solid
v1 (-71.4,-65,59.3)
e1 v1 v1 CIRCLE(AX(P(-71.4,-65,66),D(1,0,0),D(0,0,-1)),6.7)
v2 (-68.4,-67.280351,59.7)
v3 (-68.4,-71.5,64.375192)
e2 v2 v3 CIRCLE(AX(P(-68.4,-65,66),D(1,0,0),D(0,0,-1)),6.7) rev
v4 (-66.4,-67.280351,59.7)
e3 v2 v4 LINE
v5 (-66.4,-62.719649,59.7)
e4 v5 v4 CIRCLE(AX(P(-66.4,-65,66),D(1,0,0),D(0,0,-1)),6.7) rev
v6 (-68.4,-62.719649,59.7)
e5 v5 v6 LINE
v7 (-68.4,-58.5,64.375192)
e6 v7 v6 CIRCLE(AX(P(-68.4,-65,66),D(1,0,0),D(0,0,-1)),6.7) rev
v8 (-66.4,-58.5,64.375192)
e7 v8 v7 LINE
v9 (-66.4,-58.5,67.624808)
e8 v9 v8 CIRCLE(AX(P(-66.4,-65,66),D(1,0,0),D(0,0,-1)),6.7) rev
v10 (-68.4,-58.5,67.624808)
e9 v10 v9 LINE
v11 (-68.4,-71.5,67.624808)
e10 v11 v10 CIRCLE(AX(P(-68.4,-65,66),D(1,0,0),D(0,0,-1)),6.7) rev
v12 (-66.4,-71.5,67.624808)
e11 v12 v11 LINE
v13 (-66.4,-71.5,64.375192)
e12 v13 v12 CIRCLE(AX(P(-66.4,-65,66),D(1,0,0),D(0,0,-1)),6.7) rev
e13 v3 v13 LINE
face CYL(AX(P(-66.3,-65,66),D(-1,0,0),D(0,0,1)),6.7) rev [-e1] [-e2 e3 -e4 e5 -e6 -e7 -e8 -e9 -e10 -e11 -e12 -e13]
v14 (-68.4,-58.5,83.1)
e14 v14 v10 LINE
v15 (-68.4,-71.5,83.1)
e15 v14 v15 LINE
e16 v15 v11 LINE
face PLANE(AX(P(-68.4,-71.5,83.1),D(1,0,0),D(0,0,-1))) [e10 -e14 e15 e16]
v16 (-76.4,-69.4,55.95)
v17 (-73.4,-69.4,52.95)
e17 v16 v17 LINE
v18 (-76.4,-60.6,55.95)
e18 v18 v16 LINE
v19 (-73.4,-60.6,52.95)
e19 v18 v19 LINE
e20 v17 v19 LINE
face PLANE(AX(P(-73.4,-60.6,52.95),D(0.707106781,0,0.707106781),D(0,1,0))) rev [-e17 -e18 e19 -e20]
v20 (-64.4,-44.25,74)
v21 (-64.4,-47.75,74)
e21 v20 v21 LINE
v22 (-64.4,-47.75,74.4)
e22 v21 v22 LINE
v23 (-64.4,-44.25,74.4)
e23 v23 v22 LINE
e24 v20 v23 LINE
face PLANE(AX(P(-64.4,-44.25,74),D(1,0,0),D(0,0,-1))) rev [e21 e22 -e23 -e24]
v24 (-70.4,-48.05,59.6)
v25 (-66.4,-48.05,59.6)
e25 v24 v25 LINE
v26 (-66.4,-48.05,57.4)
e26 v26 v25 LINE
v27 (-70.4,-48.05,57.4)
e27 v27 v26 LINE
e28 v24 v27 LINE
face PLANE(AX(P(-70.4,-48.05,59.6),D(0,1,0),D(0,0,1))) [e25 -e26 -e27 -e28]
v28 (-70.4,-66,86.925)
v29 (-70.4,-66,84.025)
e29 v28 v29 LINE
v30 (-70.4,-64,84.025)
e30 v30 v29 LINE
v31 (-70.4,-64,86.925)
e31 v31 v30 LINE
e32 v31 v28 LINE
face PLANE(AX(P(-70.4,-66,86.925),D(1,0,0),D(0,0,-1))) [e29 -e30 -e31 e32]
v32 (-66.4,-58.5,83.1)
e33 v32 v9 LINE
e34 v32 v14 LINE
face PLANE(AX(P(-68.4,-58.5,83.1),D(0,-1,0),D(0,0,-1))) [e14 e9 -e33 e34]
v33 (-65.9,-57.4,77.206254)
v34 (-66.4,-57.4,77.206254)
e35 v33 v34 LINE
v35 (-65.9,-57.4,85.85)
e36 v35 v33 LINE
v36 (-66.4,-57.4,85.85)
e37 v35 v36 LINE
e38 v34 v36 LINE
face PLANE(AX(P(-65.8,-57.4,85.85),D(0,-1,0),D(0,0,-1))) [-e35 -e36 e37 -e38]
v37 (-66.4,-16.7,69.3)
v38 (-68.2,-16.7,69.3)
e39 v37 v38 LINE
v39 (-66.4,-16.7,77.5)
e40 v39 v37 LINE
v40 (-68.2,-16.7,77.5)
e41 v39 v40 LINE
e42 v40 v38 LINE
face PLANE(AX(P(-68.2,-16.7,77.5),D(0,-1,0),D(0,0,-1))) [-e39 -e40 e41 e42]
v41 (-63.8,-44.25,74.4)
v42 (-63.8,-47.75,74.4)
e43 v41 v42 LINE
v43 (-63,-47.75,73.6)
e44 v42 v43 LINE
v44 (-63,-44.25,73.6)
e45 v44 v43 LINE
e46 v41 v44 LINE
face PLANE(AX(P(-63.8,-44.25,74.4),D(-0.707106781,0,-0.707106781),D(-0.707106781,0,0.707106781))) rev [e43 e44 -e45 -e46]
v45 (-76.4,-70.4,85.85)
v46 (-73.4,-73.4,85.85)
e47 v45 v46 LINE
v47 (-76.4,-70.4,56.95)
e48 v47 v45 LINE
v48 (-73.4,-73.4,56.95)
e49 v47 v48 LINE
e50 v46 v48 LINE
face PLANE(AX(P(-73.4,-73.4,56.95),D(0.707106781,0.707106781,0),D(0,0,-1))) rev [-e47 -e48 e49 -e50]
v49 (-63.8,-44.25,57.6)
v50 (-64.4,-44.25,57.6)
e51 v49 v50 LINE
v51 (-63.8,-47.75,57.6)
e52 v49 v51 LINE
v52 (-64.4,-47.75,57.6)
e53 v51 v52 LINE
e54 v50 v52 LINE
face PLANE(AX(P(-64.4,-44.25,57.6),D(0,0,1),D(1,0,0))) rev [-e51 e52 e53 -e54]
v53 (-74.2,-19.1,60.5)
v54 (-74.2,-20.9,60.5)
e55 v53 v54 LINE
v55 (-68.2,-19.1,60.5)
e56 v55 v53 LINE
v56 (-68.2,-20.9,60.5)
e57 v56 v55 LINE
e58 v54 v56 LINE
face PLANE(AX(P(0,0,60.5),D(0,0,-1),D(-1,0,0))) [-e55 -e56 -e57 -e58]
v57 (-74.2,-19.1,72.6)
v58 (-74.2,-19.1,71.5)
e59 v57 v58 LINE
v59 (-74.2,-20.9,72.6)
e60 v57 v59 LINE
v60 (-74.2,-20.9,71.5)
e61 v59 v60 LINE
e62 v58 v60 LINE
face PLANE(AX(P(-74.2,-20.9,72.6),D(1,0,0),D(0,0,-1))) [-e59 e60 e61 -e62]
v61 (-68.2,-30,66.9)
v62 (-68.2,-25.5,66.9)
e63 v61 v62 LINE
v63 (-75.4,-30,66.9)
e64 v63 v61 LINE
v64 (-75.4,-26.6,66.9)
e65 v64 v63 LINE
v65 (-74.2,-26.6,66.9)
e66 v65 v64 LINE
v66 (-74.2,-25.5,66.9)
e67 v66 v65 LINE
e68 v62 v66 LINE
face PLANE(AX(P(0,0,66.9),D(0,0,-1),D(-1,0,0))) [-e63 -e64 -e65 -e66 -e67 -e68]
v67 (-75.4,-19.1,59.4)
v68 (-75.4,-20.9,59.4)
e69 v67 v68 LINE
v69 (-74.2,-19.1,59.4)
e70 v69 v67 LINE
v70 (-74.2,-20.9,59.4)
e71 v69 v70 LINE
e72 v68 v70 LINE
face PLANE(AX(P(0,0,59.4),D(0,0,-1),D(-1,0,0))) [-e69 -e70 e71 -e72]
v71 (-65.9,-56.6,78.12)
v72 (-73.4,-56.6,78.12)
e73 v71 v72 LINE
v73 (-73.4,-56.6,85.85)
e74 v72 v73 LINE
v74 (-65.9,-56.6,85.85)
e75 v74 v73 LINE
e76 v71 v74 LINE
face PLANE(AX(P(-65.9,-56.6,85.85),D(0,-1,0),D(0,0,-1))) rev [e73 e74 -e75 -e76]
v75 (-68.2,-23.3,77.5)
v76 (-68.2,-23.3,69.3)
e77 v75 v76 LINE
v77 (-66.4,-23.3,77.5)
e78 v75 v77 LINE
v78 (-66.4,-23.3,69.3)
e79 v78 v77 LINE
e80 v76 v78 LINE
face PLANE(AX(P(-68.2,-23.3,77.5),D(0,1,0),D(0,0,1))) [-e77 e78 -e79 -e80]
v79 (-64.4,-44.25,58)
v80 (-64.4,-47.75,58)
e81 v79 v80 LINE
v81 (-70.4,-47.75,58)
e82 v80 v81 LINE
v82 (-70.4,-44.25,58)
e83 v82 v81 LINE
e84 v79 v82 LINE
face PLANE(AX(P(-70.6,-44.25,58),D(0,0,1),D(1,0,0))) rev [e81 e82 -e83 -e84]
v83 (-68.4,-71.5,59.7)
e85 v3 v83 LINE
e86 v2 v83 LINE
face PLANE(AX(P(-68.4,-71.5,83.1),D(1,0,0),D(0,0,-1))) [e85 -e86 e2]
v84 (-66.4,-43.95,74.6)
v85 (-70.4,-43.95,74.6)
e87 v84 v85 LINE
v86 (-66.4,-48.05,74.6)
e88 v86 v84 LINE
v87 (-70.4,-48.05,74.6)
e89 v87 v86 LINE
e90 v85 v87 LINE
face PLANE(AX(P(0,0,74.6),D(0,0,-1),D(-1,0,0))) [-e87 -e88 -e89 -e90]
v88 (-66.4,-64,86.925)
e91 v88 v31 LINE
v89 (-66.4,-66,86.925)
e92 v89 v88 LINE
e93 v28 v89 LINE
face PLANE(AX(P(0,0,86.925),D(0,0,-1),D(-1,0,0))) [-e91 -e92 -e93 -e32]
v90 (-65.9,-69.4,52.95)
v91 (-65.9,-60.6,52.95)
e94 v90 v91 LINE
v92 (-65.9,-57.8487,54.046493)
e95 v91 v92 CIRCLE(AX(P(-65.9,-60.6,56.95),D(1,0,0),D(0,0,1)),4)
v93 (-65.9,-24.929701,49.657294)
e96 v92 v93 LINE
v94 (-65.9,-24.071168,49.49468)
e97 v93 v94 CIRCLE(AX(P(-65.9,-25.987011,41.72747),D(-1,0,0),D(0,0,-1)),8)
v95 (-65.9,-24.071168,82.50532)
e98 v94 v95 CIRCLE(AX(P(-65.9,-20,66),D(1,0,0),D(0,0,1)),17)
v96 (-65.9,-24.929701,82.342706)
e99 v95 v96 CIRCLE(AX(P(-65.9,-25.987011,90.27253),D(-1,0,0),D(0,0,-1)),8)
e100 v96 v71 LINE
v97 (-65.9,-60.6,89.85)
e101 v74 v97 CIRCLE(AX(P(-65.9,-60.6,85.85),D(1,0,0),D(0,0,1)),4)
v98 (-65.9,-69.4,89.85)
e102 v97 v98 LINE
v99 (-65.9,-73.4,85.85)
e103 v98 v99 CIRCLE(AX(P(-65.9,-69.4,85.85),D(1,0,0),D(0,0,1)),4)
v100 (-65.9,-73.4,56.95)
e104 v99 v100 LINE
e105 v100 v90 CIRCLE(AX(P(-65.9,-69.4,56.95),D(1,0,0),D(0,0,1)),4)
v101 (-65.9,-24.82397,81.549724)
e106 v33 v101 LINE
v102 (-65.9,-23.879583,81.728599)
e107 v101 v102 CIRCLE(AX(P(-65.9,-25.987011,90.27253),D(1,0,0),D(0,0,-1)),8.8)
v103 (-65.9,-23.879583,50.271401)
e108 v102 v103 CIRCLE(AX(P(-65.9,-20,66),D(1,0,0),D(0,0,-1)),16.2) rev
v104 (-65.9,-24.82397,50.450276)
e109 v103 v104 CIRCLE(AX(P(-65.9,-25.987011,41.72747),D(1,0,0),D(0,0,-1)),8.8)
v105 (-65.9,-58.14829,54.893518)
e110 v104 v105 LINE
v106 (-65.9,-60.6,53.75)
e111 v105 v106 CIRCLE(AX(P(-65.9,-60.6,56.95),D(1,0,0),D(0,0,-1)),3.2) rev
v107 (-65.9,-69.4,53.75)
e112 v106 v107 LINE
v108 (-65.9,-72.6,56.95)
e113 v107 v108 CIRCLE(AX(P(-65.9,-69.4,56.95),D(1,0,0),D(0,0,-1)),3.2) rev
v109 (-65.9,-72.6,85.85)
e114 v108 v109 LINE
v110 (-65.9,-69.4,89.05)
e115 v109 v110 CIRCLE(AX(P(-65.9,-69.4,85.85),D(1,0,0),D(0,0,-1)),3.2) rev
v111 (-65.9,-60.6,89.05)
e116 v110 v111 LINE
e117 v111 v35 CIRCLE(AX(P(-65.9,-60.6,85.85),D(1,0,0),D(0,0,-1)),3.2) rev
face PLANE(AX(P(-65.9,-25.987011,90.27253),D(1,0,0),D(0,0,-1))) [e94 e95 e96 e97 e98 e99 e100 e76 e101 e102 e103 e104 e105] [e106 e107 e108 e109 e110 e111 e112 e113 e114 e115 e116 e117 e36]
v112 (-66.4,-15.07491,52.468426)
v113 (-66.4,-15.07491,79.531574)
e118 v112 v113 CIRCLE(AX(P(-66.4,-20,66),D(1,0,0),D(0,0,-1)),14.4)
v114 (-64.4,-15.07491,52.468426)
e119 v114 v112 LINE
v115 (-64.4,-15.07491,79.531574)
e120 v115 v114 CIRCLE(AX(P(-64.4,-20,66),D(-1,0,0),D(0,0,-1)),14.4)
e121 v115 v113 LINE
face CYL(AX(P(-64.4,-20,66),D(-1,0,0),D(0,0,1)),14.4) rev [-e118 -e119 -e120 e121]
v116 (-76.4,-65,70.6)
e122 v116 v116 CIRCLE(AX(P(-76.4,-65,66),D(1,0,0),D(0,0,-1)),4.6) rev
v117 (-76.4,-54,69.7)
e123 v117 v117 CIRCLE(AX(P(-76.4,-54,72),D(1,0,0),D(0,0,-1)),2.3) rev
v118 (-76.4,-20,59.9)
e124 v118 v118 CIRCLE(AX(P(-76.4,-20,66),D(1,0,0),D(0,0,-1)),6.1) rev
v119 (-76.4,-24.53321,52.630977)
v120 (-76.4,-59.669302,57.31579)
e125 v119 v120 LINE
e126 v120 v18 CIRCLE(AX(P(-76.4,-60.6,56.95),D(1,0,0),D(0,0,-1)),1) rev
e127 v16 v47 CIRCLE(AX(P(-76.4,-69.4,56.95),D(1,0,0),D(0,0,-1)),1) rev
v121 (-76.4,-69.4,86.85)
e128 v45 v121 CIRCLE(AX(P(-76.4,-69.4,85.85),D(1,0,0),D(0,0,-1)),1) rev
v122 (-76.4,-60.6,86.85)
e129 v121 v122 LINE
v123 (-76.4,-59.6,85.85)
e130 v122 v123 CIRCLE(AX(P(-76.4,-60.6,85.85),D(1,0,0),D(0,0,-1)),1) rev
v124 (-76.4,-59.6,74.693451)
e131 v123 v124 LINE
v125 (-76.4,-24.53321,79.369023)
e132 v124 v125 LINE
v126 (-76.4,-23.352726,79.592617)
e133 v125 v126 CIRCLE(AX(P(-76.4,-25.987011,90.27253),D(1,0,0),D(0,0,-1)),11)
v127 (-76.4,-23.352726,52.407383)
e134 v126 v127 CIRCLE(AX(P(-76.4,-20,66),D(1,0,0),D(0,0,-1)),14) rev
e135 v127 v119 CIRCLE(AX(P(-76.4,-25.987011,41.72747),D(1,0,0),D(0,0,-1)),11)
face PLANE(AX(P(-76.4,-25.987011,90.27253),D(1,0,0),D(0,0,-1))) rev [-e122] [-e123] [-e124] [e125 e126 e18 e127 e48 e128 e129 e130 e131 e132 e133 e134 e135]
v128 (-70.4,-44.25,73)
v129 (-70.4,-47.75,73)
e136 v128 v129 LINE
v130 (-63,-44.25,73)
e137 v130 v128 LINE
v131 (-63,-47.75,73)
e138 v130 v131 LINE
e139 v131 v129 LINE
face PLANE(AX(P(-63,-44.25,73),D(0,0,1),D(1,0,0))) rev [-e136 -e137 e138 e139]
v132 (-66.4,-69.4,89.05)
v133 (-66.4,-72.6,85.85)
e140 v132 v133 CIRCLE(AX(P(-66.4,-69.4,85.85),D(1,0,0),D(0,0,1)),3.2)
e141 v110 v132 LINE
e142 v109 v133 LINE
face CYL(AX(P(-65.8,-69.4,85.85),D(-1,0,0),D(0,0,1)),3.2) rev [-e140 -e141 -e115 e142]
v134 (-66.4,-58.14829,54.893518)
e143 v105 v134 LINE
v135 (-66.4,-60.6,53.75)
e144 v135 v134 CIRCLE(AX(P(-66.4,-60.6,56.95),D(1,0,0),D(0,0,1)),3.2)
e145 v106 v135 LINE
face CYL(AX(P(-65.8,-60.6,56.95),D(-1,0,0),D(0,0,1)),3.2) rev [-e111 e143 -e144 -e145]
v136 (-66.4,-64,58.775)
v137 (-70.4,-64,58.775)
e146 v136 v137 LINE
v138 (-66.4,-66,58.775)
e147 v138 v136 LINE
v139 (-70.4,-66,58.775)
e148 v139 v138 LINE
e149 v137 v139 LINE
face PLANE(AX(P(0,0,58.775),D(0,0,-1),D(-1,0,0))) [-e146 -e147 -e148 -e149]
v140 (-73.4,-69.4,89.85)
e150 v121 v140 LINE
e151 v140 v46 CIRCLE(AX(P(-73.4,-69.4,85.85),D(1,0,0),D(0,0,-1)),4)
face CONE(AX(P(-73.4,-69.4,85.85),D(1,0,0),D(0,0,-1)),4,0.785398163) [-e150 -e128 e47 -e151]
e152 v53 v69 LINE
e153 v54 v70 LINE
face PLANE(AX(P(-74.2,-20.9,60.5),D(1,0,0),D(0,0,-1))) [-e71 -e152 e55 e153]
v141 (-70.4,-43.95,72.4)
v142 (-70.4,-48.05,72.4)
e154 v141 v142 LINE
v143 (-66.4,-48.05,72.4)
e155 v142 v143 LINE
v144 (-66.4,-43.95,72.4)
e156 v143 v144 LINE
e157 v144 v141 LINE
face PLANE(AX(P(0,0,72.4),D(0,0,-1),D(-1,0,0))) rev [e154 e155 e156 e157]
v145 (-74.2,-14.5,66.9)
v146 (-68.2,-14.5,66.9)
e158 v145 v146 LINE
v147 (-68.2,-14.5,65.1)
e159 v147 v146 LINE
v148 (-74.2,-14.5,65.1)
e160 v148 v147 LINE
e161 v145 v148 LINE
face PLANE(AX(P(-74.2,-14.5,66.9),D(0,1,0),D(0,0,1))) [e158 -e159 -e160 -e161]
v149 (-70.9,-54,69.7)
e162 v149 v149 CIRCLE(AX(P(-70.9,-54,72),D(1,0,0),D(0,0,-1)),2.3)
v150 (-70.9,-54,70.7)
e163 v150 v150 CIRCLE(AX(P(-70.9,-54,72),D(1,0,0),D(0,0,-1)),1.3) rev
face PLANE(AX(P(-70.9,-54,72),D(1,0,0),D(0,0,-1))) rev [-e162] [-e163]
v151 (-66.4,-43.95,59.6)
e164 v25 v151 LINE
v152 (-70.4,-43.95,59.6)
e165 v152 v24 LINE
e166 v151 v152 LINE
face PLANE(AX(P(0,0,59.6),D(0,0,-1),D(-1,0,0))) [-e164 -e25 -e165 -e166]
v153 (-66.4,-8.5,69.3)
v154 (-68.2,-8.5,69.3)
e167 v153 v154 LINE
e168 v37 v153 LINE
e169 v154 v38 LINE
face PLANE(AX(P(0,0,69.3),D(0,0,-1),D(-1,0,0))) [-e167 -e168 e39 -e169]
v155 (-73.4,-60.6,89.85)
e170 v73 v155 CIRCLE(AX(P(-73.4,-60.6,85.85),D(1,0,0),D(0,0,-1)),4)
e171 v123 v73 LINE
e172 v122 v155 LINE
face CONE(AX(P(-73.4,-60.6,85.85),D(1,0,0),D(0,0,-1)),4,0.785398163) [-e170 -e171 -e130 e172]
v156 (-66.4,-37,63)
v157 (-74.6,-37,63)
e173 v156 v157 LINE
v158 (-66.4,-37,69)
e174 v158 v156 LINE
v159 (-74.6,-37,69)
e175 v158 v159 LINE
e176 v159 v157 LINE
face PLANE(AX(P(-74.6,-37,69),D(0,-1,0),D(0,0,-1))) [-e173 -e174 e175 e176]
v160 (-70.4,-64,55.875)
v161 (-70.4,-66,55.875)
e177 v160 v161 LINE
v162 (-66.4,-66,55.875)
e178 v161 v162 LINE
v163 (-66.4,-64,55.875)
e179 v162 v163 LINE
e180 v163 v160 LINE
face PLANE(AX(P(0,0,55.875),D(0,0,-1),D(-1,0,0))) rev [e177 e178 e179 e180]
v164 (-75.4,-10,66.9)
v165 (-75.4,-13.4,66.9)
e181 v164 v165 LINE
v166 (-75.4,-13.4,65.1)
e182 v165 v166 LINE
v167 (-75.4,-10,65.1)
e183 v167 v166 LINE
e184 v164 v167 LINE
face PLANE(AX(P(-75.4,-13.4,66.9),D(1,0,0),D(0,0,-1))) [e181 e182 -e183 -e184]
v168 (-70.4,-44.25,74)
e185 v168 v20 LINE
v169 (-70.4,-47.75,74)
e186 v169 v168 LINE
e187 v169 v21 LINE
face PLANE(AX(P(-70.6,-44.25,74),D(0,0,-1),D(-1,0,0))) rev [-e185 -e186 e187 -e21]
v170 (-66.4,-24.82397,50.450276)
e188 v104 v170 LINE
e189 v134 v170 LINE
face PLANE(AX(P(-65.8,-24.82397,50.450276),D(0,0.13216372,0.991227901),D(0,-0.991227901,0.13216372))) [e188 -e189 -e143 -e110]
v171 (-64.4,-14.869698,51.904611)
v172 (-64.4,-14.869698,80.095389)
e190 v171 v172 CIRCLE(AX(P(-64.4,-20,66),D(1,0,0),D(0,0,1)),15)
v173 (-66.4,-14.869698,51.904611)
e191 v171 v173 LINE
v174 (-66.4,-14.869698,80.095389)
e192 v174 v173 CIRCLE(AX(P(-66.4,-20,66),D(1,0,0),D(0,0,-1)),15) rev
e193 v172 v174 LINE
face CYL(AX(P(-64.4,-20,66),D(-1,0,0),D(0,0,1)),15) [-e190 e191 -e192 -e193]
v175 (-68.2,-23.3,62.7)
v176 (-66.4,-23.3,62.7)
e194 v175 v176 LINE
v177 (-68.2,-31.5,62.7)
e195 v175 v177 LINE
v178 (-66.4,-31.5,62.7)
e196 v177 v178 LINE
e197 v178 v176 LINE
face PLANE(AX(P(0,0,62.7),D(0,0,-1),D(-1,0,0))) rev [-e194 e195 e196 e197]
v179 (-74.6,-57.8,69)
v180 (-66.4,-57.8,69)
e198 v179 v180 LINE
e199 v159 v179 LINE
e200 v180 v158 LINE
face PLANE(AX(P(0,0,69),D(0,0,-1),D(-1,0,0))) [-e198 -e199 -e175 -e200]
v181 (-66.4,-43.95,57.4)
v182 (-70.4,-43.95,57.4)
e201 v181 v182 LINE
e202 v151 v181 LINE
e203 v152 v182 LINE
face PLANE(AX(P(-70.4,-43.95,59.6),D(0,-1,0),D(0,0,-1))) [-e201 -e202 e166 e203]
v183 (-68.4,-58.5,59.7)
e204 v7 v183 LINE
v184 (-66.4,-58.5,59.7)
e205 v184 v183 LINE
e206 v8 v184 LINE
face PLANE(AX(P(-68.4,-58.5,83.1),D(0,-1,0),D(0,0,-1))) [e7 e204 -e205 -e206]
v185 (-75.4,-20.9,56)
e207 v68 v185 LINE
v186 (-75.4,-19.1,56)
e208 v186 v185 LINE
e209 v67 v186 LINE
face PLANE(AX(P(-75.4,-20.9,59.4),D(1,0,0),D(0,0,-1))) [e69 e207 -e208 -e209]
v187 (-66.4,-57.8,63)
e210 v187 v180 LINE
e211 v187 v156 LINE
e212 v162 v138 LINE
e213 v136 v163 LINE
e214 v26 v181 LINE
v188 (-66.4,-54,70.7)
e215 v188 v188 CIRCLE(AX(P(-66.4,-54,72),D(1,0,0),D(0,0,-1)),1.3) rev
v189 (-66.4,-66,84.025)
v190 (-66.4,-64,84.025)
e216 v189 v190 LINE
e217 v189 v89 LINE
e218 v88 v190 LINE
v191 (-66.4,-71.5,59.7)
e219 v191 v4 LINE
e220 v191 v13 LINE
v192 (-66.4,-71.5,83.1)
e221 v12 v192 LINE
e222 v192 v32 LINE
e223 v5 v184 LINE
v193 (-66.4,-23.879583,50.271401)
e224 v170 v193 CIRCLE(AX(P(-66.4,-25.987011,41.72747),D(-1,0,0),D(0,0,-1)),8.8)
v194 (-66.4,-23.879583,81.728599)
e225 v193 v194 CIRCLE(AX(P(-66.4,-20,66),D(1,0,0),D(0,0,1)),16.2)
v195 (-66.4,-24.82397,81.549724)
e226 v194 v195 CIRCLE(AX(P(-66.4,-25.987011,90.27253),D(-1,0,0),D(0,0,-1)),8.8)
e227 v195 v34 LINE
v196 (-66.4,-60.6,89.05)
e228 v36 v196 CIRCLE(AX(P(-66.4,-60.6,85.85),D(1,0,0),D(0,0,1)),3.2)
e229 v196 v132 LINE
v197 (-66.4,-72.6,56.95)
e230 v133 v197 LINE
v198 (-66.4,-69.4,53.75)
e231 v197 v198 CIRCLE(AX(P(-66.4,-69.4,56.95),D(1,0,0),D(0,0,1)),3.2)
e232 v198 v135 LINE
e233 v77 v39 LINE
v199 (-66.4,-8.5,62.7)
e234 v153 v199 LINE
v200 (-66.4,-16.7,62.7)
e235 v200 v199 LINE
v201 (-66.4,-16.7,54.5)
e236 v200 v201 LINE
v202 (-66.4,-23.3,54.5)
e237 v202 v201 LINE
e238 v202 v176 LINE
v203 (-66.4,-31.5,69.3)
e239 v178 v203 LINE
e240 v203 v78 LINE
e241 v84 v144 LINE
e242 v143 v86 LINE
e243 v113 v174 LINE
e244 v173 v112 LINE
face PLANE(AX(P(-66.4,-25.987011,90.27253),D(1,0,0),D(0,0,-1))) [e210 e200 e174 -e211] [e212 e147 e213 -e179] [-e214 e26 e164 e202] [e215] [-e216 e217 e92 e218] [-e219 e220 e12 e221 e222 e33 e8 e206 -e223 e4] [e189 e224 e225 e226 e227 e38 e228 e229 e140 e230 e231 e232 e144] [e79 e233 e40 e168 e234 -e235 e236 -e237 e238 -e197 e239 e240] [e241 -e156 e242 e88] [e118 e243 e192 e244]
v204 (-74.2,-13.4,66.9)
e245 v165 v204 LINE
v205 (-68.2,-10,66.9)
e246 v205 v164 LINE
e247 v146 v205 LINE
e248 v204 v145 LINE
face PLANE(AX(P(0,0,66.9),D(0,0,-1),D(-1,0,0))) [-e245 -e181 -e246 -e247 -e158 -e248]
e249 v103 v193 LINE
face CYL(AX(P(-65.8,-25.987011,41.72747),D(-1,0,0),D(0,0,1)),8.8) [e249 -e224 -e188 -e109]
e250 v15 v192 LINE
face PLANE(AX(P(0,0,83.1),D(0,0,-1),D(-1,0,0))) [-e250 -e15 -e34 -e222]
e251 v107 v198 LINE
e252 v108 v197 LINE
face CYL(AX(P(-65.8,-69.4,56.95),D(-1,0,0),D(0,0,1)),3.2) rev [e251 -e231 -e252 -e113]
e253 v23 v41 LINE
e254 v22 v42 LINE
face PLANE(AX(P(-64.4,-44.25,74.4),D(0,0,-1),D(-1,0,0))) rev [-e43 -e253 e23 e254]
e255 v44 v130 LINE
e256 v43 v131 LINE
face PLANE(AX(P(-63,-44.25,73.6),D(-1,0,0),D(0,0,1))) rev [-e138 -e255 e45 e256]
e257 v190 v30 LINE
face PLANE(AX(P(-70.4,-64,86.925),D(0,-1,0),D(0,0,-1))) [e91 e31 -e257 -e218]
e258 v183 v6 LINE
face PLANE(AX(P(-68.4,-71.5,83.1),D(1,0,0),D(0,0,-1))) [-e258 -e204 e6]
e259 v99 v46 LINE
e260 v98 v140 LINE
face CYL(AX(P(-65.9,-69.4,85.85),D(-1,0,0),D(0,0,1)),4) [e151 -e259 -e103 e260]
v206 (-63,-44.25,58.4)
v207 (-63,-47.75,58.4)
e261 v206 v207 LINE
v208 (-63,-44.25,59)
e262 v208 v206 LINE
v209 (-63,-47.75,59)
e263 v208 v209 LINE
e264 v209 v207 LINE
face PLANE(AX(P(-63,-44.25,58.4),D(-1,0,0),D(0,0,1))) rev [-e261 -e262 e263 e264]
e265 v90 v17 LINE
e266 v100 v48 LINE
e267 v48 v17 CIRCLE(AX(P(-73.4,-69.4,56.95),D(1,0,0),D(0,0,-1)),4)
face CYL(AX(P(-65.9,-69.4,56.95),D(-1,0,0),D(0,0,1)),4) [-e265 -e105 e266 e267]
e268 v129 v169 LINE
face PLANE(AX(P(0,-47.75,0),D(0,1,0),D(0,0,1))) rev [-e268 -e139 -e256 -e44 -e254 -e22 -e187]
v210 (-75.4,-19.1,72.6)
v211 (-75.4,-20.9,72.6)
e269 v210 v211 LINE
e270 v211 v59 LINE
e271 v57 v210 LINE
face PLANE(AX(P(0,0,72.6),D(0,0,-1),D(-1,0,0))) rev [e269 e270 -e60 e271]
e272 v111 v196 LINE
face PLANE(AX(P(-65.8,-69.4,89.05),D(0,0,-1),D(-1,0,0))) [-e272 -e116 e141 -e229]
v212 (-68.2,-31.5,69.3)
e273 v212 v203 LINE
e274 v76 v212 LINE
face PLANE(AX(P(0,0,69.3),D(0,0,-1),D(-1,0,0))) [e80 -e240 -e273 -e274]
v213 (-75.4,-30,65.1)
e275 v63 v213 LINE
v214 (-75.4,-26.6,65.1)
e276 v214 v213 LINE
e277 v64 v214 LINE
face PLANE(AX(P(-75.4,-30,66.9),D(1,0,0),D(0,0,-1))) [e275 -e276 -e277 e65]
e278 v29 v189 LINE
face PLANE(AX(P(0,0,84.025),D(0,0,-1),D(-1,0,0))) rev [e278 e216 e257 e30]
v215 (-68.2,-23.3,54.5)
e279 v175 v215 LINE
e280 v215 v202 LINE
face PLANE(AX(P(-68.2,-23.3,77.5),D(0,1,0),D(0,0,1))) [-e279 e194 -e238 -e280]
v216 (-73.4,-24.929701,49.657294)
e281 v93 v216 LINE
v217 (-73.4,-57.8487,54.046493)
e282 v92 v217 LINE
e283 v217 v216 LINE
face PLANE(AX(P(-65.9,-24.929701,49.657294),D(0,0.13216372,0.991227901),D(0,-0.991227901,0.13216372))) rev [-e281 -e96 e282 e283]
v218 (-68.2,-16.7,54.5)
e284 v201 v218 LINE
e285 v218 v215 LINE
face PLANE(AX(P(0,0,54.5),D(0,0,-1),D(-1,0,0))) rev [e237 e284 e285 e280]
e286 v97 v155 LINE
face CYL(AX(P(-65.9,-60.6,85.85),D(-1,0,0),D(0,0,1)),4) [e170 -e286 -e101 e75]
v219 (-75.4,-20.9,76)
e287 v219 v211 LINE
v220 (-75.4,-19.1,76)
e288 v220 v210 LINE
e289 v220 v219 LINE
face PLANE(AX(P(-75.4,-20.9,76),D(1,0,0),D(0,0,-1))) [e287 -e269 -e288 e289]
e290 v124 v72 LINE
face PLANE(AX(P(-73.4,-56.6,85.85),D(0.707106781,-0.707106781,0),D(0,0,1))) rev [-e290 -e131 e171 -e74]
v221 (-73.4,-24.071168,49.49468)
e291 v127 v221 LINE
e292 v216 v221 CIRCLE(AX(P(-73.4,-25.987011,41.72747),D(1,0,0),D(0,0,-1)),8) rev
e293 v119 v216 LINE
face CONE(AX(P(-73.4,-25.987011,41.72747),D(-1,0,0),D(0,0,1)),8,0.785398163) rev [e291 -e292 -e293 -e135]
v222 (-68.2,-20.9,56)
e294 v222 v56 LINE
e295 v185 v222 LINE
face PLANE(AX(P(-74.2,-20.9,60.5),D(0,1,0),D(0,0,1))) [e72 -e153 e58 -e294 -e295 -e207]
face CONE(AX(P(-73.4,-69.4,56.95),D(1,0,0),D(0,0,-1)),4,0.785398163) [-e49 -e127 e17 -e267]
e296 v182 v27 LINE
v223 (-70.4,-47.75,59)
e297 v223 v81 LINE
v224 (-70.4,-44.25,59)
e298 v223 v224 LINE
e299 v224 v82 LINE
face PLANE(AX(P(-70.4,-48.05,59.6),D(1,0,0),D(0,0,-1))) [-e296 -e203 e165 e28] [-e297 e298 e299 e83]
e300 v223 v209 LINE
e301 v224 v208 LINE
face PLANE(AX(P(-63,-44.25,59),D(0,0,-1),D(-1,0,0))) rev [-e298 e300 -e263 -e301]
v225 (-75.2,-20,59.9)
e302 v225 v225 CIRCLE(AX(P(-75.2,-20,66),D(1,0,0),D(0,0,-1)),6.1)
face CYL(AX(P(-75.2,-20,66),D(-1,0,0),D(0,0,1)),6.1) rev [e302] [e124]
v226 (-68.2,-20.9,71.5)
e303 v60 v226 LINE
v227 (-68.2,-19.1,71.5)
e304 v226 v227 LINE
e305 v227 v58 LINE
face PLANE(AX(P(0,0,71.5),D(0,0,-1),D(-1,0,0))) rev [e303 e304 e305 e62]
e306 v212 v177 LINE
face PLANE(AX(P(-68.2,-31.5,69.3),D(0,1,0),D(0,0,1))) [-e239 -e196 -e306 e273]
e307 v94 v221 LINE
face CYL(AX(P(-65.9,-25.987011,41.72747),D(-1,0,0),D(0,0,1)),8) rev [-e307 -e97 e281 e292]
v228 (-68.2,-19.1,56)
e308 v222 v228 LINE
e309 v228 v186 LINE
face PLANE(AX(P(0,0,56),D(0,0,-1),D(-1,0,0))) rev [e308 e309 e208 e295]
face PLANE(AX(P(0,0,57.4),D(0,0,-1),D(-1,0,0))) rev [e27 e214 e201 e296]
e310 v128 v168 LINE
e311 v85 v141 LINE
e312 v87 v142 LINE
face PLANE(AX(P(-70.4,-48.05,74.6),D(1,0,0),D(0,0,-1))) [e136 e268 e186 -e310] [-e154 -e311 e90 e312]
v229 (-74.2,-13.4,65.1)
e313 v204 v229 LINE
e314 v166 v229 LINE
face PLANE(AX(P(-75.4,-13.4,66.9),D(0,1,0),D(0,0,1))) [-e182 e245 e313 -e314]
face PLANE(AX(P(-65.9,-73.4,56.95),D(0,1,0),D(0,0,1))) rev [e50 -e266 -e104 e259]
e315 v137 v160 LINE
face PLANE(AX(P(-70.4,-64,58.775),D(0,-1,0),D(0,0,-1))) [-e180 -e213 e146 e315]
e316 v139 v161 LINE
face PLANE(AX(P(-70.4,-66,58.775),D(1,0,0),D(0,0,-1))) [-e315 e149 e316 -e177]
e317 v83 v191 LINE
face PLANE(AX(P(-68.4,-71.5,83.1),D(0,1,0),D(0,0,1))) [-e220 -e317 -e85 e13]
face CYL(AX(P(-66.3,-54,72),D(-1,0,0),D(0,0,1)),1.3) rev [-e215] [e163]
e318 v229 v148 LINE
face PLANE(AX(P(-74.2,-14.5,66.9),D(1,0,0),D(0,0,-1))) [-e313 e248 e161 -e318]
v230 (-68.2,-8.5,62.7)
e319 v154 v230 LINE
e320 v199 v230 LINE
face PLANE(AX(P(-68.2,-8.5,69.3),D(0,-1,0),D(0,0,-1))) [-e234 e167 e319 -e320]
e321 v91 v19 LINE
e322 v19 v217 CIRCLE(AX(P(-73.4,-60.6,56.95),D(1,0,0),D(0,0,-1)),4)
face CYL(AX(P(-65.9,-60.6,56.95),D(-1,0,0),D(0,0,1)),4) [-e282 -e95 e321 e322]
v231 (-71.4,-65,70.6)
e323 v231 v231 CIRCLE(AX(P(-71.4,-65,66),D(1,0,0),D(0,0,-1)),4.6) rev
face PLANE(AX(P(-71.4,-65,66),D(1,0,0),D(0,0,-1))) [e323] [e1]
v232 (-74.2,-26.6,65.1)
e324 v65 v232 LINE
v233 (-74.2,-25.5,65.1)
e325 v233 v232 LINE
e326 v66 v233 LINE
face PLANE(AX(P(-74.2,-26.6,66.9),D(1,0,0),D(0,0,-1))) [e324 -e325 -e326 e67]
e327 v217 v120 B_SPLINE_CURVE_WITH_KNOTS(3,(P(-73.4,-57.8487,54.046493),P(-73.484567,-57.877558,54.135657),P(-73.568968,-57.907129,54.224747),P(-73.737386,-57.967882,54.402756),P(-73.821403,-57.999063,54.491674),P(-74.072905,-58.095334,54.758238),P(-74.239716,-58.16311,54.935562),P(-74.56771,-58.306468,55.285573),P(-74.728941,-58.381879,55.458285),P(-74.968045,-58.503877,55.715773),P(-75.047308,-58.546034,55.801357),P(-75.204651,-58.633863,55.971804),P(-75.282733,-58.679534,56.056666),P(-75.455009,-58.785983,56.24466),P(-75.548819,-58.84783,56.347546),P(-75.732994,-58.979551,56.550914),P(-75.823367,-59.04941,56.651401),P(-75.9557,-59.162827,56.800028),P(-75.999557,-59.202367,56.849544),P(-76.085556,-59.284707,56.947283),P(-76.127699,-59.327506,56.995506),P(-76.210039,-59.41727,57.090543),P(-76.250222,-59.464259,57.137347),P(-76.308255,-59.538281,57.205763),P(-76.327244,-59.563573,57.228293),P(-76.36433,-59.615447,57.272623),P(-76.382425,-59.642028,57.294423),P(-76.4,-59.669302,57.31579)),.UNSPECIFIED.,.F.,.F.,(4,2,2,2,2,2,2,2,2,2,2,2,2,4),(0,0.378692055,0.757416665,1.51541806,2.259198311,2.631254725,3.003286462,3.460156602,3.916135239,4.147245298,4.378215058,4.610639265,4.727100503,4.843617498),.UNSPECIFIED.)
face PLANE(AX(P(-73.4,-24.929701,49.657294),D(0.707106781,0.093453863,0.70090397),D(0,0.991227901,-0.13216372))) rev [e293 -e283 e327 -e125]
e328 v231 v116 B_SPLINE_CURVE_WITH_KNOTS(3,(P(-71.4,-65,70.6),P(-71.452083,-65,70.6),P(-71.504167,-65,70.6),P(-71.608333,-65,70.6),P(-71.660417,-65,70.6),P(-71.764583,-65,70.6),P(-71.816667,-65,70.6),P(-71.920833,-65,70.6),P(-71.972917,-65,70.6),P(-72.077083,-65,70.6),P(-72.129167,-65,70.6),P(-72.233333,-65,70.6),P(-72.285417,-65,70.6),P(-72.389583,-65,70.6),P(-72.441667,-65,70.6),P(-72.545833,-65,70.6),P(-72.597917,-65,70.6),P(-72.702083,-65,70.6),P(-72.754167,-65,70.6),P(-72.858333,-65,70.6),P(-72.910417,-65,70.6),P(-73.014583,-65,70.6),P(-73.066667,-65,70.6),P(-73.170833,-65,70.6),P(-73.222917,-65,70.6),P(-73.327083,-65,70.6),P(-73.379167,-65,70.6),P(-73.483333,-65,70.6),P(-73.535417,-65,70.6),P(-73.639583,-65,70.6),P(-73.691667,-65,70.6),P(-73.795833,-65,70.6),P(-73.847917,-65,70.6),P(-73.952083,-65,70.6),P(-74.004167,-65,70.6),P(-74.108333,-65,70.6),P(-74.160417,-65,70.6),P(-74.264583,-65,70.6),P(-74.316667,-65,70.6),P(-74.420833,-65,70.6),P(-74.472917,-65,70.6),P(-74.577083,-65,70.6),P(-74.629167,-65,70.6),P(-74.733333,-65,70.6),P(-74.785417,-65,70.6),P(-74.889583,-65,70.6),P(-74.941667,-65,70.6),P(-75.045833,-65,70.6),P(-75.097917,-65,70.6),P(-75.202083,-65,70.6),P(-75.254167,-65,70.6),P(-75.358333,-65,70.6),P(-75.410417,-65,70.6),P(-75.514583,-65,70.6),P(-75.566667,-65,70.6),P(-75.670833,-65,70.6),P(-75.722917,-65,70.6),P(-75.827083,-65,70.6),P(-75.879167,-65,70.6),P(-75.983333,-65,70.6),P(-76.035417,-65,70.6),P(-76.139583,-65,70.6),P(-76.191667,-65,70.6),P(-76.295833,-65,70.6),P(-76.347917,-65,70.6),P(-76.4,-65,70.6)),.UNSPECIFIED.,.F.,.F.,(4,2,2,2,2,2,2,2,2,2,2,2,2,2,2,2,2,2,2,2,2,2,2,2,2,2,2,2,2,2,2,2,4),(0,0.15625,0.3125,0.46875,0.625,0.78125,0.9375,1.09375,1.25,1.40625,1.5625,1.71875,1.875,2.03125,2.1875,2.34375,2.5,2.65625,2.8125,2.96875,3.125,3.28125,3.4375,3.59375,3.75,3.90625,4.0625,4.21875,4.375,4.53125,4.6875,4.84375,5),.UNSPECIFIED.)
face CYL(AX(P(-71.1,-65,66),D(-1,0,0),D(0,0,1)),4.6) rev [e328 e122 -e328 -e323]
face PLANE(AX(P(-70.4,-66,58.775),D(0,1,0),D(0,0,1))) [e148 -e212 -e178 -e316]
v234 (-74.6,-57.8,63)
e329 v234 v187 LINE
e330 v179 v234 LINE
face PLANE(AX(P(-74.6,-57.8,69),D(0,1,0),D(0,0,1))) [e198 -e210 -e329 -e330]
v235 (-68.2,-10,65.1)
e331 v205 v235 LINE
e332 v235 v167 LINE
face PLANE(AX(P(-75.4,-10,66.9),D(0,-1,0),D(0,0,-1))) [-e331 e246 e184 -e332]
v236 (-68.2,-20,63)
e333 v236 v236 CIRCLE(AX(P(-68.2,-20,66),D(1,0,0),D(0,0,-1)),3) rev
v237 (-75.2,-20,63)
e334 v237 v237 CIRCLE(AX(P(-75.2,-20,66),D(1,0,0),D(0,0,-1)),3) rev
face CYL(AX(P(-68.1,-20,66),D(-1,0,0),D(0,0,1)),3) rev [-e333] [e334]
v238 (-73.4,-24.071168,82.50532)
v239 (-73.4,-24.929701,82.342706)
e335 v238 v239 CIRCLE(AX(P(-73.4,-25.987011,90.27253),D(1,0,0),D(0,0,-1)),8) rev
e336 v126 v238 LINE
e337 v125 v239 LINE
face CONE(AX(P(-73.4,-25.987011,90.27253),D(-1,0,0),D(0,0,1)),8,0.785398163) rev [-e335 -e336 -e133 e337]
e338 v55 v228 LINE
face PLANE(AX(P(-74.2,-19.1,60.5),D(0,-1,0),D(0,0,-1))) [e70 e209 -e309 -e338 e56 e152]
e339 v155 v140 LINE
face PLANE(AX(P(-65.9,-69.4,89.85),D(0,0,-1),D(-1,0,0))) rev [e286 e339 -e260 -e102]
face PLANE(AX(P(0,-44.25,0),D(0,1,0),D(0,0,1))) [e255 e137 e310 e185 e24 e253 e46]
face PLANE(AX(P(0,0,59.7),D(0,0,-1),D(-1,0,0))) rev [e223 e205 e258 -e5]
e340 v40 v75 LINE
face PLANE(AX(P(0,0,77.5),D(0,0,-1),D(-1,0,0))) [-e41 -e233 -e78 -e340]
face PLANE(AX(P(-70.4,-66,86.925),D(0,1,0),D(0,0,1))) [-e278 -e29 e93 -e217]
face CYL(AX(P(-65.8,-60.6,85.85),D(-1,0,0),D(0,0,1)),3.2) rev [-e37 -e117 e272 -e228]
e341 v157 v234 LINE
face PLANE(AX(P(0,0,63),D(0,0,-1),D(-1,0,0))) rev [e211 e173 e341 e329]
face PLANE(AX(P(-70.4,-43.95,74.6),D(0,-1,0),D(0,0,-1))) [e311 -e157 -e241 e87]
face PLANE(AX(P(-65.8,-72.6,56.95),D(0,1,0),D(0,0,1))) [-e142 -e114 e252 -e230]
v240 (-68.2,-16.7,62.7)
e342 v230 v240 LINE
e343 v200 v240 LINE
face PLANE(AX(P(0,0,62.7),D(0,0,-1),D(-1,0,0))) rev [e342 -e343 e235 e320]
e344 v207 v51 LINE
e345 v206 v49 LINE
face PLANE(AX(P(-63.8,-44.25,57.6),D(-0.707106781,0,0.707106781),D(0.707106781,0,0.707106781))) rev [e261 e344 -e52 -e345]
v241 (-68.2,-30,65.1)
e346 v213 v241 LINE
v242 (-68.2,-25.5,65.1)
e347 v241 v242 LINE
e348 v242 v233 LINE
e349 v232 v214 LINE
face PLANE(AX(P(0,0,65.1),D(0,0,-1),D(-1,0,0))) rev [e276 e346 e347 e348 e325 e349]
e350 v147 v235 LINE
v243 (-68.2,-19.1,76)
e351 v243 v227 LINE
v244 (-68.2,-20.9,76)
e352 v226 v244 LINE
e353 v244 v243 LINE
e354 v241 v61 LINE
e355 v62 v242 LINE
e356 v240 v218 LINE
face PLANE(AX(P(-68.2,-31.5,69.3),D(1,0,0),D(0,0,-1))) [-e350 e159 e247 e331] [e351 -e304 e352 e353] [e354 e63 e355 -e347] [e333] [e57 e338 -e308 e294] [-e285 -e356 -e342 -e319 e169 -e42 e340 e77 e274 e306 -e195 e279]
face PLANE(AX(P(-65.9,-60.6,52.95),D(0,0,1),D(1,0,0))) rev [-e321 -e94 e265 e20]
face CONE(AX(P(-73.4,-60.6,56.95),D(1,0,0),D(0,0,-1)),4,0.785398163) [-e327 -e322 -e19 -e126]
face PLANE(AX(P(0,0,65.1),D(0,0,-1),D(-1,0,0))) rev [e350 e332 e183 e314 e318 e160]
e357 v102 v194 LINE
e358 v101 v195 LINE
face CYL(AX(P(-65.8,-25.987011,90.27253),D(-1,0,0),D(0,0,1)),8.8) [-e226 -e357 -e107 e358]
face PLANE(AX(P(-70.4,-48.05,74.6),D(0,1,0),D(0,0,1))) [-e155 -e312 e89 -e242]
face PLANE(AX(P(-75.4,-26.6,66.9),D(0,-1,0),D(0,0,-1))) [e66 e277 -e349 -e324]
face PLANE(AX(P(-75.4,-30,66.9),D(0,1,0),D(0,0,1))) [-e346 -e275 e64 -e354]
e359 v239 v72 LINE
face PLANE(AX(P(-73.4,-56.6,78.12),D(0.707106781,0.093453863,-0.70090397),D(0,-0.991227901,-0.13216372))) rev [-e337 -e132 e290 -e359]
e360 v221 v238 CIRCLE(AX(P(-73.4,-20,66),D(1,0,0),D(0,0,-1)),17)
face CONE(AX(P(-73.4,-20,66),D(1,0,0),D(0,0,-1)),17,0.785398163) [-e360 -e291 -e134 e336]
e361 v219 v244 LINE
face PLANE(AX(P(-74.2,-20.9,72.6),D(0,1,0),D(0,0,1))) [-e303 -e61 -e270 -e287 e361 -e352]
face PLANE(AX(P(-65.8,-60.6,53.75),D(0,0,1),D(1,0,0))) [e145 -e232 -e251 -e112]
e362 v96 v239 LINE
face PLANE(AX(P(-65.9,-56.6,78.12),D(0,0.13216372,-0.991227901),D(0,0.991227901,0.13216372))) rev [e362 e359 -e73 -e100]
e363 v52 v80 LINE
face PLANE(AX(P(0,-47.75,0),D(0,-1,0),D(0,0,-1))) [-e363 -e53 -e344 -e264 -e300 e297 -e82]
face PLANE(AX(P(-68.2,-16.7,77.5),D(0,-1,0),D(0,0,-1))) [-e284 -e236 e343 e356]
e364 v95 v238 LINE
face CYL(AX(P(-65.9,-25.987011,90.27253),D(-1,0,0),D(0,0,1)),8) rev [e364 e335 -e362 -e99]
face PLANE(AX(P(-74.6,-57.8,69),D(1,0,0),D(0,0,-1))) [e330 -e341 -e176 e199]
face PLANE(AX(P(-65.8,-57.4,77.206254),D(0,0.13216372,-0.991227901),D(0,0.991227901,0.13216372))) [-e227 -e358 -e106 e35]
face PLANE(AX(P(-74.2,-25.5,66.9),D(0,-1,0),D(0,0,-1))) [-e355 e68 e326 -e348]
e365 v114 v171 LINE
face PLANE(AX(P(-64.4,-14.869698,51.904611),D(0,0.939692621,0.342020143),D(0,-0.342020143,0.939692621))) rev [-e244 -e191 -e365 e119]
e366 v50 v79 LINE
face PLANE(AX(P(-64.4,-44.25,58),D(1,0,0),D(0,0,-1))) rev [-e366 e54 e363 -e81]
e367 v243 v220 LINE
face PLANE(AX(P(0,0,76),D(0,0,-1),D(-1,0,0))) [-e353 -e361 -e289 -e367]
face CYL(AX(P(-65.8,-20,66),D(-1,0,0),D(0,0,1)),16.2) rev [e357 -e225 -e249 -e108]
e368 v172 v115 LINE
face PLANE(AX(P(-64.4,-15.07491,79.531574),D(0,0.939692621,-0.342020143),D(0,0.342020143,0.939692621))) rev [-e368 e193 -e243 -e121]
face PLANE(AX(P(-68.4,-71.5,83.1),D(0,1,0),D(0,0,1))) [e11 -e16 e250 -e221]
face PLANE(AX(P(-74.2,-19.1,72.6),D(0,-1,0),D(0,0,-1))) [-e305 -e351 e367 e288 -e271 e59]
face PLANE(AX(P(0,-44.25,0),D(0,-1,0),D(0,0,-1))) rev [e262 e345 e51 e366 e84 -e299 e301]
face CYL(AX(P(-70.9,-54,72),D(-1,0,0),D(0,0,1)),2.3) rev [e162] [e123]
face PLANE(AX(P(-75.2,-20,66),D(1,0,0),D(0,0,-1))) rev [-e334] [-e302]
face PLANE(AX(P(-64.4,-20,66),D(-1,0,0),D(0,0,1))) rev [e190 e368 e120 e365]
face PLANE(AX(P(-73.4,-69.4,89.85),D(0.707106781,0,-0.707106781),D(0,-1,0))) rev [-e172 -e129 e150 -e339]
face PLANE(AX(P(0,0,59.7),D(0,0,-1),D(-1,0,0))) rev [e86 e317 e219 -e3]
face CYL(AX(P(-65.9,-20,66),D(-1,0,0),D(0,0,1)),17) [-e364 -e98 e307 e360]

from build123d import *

# Parameters (mm, degrees)
BOSS_EXTRUDE1_START  = -76.4
BOSS_EXTRUDE1_DEPTH  = 10.5
BOSS_EXTRUDE2_START  = -66.4
BOSS_EXTRUDE2_DEPTH  = 0.6
CHAMFER1_SIZE        = 3
CHAMFER2_SIZE        = 3
BOSS_EXTRUDE3_START  = 62.7
SKETCH3_W            = 2.3
SKETCH3_H            = 23
BOSS_EXTRUDE3_DEPTH  = 6.6
BOSS_EXTRUDE4_START  = 54.5
SKETCH4_W            = 2.3
SKETCH4_H            = 6.6
BOSS_EXTRUDE4_DEPTH  = 23
BOSS_EXTRUDE5_START  = -68.2
SKETCH5_R            = 4.6
BOSS_EXTRUDE5_DEPTH  = 2.3
BOSS_EXTRUDE6_START  = -76.9
SKETCH6_R            = 6.1
BOSS_EXTRUDE6_DEPTH  = 1.7
BOSS_EXTRUDE7_START  = -75.3
SKETCH7_R            = 3
BOSS_EXTRUDE7_DEPTH  = 7.2
BOSS_EXTRUDE8_START  = 65.1
SKETCH8_W            = 6.1
SKETCH8_H            = 1.1
BOSS_EXTRUDE8_DEPTH  = 1.8
BOSS_EXTRUDE9_START  = 71.5
SKETCH9_W            = 6.1
SKETCH9_H            = 1.8
BOSS_EXTRUDE9_DEPTH  = 1.1
BOSS_EXTRUDE10_START = 65.1
SKETCH10_W           = 6.1
SKETCH10_H           = 1.1
BOSS_EXTRUDE10_DEPTH = 1.8
BOSS_EXTRUDE11_START = 59.4
SKETCH11_W           = 6.1
SKETCH11_H           = 1.8
BOSS_EXTRUDE11_DEPTH = 1.1
BOSS_EXTRUDE12_START = 65.1
SKETCH12_W           = 7.3
SKETCH12_H           = 3.4
BOSS_EXTRUDE12_DEPTH = 1.8
BOSS_EXTRUDE13_START = 72.6
SKETCH13_W           = 7.3
SKETCH13_H           = 1.8
BOSS_EXTRUDE13_DEPTH = 3.4
BOSS_EXTRUDE14_START = 65.1
SKETCH14_W           = 7.3
SKETCH14_H           = 3.4
BOSS_EXTRUDE14_DEPTH = 1.8
BOSS_EXTRUDE15_START = 56
SKETCH15_W           = 7.3
SKETCH15_H           = 1.8
BOSS_EXTRUDE15_DEPTH = 3.4
BOSS_EXTRUDE16_START = -66.45
BOSS_EXTRUDE16_DEPTH = 2.05
BOSS_EXTRUDE17_START = 55.875
SKETCH17_W           = 4.1
SKETCH17_H           = 2
BOSS_EXTRUDE17_DEPTH = 2.9
BOSS_EXTRUDE18_START = 84.025
SKETCH18_W           = 4.1
SKETCH18_H           = 2
BOSS_EXTRUDE18_DEPTH = 2.9
BOSS_EXTRUDE19_START = 59.7
SKETCH19_W           = 2.1
SKETCH19_H           = 13
BOSS_EXTRUDE19_DEPTH = 23.4
BOSS_EXTRUDE20_START = -71.4
SKETCH20_R           = 6.7
BOSS_EXTRUDE20_DEPTH = 5.1
BOSS_EXTRUDE21_START = -76.9
SKETCH21_R           = 4.6
BOSS_EXTRUDE21_DEPTH = 5.8
BOSS_EXTRUDE22_START = 63
SKETCH22_W           = 8.3
SKETCH22_H           = 20.8
BOSS_EXTRUDE22_DEPTH = 6
BOSS_EXTRUDE23_START = -76.9
SKETCH23_R           = 2.3
BOSS_EXTRUDE23_DEPTH = 6
BOSS_EXTRUDE24_START = -70.95
SKETCH24_R           = 1.3
BOSS_EXTRUDE24_DEPTH = 4.65
BOSS_EXTRUDE25_START = 57.4
SKETCH25_W           = 4.1
SKETCH25_H           = 4.1
BOSS_EXTRUDE25_DEPTH = 2.2
BOSS_EXTRUDE26_START = -47.75
BOSS_EXTRUDE26_DEPTH = 3.5
BOSS_EXTRUDE27_START = 72.4
SKETCH27_W           = 4.1
SKETCH27_H           = 4.1
BOSS_EXTRUDE27_DEPTH = 2.2
BOSS_EXTRUDE28_START = -47.75
BOSS_EXTRUDE28_DEPTH = 3.5


with BuildPart() as part:
    # Sketch1 → Boss-Extrude1 (new body)
    with BuildSketch(Plane(origin=(0, 0, 0), x_dir=(0, 0, -1), z_dir=(1, 0, 0)).offset(BOSS_EXTRUDE1_START)):
        with BuildLine():
            Line((-49.657293521, -24.929701405), (-54.04649339, -57.848700423))
            ThreePointArc((-54.04649339, -57.848700423), (-53.234221048, -59.119126346), (-52.95, -60.6))
            Line((-52.95, -60.6), (-52.95, -69.4))
            ThreePointArc((-52.95, -69.4), (-54.121572875, -72.228427125), (-56.95, -73.4))
            Line((-56.95, -73.4), (-85.85, -73.4))
            ThreePointArc((-85.85, -73.4), (-88.678427125, -72.228427125), (-89.85, -69.4))
            Line((-89.85, -69.4), (-89.85, -60.6))
            ThreePointArc((-89.85, -60.6), (-88.678427125, -57.771572875), (-85.85, -56.6))
            Line((-85.85, -56.6), (-78.12, -56.6))
            Line((-78.12, -56.6), (-82.342706479, -24.929701405))
            ThreePointArc((-82.342706479, -24.929701405), (-82.412282932, -24.49821266), (-82.505320186, -24.071167593))
            ThreePointArc((-82.505320186, -24.071167593), (-66, -3), (-49.494679814, -24.071167593))
            ThreePointArc((-49.494679814, -24.071167593), (-49.587717068, -24.49821266), (-49.657293521, -24.929701405))
        make_face()
    extrude(amount=BOSS_EXTRUDE1_DEPTH)


with BuildPart() as body_2:
    # Sketch2 → Boss-Extrude2 (new body)
    with BuildSketch(Plane(origin=(0, 0, 0), x_dir=(0, 0, -1), z_dir=(1, 0, 0)).offset(BOSS_EXTRUDE2_START)):
        with BuildLine():
            Line((-50.450275841, -24.823970429), (-54.893518409, -58.148289686))
            ThreePointArc((-54.893518409, -58.148289686), (-54.049936113, -59.247362039), (-53.75, -60.6))
            Line((-53.75, -60.6), (-53.75, -69.4))
            ThreePointArc((-53.75, -69.4), (-54.6872583, -71.6627417), (-56.95, -72.6))
            Line((-56.95, -72.6), (-85.85, -72.6))
            ThreePointArc((-85.85, -72.6), (-88.1127417, -71.6627417), (-89.05, -69.4))
            Line((-89.05, -69.4), (-89.05, -60.6))
            ThreePointArc((-89.05, -60.6), (-88.1127417, -58.3372583), (-85.85, -57.4))
            Line((-85.85, -57.4), (-77.206253549, -57.4))
            Line((-77.206253549, -57.4), (-81.549724159, -24.823970429))
            ThreePointArc((-81.549724159, -24.823970429), (-81.626258257, -24.34933281), (-81.728599236, -23.879583236))
            ThreePointArc((-81.728599236, -23.879583236), (-66, -3.8), (-50.271400764, -23.879583236))
            ThreePointArc((-50.271400764, -23.879583236), (-50.373741743, -24.34933281), (-50.450275841, -24.823970429))
        make_face()
    extrude(amount=BOSS_EXTRUDE2_DEPTH)


with BuildPart() as part_1:
    add(part.part)

    # Combine1: cut body 2
    add(body_2.part, mode=Mode.SUBTRACT)

    # Chamfer1
    chamfer1_edges = [part_1.edges().sort_by_distance(p)[0] for p in [
        (-76.4, -3, 66),
        (-76.4, -24.49821266, 49.587717068),
        (-76.4, -41.389200914, 51.851893455),
        (-76.4, -40.764850703, 80.23135324),
        (-76.4, -24.49821266, 82.412282932),
    ]]
    chamfer(chamfer1_edges, length=CHAMFER1_SIZE)

    # Chamfer2
    chamfer2_edges = [part_1.edges().sort_by_distance(p)[0] for p in [
        (-76.4, -57.786965833, 54.106263237),
        (-76.4, -65, 52.95),
        (-76.4, -72.228427125, 54.121572875),
        (-76.4, -73.4, 71.4),
        (-76.4, -72.228427125, 88.678427125),
        (-76.4, -65, 89.85),
        (-76.4, -57.771572875, 88.678427125),
        (-76.4, -56.6, 80.471725405),
    ]]
    chamfer(chamfer2_edges, length=CHAMFER2_SIZE)


with BuildPart() as body_2_2:
    # Sketch3 → Boss-Extrude3 (new body)
    with BuildSketch(Plane.XY.offset(BOSS_EXTRUDE3_START)):
        with Locations((-67.05, -20)):
            Rectangle(SKETCH3_W, SKETCH3_H)
    extrude(amount=BOSS_EXTRUDE3_DEPTH)


with BuildPart() as part_2:
    add(part_1.part)

    # Combine2: cut body 2 2
    add(body_2_2.part, mode=Mode.SUBTRACT)


with BuildPart() as body_2_3:
    # Sketch4 → Boss-Extrude4 (new body)
    with BuildSketch(Plane.XY.offset(BOSS_EXTRUDE4_START)):
        with Locations((-67.05, -20)):
            Rectangle(SKETCH4_W, SKETCH4_H)
    extrude(amount=BOSS_EXTRUDE4_DEPTH)


with BuildPart() as part_3:
    add(part_2.part)

    # Combine3: cut body 2 3
    add(body_2_3.part, mode=Mode.SUBTRACT)


with BuildPart() as body_2_4:
    # Sketch5 → Boss-Extrude5 (new body)
    with BuildSketch(Plane(origin=(0, 0, 0), x_dir=(0, 0, -1), z_dir=(1, 0, 0)).offset(BOSS_EXTRUDE5_START)):
        with Locations((-66, -20)):
            Circle(SKETCH5_R)
    extrude(amount=BOSS_EXTRUDE5_DEPTH)


with BuildPart() as part_4:
    add(part_3.part)

    # Combine4: cut body 2 4
    add(body_2_4.part, mode=Mode.SUBTRACT)


with BuildPart() as body_2_5:
    # Sketch6 → Boss-Extrude6 (new body)
    with BuildSketch(Plane(origin=(0, 0, 0), x_dir=(0, 0, -1), z_dir=(1, 0, 0)).offset(BOSS_EXTRUDE6_START)):
        with Locations((-66, -20)):
            Circle(SKETCH6_R)
    extrude(amount=BOSS_EXTRUDE6_DEPTH)


with BuildPart() as part_5:
    add(part_4.part)

    # Combine5: cut body 2 5
    add(body_2_5.part, mode=Mode.SUBTRACT)


with BuildPart() as body_2_6:
    # Sketch7 → Boss-Extrude7 (new body)
    with BuildSketch(Plane(origin=(0, 0, 0), x_dir=(0, 0, -1), z_dir=(1, 0, 0)).offset(BOSS_EXTRUDE7_START)):
        with Locations((-66, -20)):
            Circle(SKETCH7_R)
    extrude(amount=BOSS_EXTRUDE7_DEPTH)


with BuildPart() as part_6:
    add(part_5.part)

    # Combine6: cut body 2 6
    add(body_2_6.part, mode=Mode.SUBTRACT)


with BuildPart() as body_2_7:
    # Sketch8 → Boss-Extrude8 (new body)
    with BuildSketch(Plane.XY.offset(BOSS_EXTRUDE8_START)):
        with Locations((-71.15, -13.95)):
            Rectangle(SKETCH8_W, SKETCH8_H)
    extrude(amount=BOSS_EXTRUDE8_DEPTH)


with BuildPart() as part_7:
    add(part_6.part)

    # Combine7: cut body 2 7
    add(body_2_7.part, mode=Mode.SUBTRACT)


with BuildPart() as body_2_8:
    # Sketch9 → Boss-Extrude9 (new body)
    with BuildSketch(Plane.XY.offset(BOSS_EXTRUDE9_START)):
        with Locations((-71.15, -20)):
            Rectangle(SKETCH9_W, SKETCH9_H)
    extrude(amount=BOSS_EXTRUDE9_DEPTH)


with BuildPart() as part_8:
    add(part_7.part)

    # Combine8: cut body 2 8
    add(body_2_8.part, mode=Mode.SUBTRACT)


with BuildPart() as body_2_9:
    # Sketch10 → Boss-Extrude10 (new body)
    with BuildSketch(Plane.XY.offset(BOSS_EXTRUDE10_START)):
        with Locations((-71.15, -26.05)):
            Rectangle(SKETCH10_W, SKETCH10_H)
    extrude(amount=BOSS_EXTRUDE10_DEPTH)


with BuildPart() as part_9:
    add(part_8.part)

    # Combine9: cut body 2 9
    add(body_2_9.part, mode=Mode.SUBTRACT)


with BuildPart() as body_2_10:
    # Sketch11 → Boss-Extrude11 (new body)
    with BuildSketch(Plane.XY.offset(BOSS_EXTRUDE11_START)):
        with Locations((-71.15, -20)):
            Rectangle(SKETCH11_W, SKETCH11_H)
    extrude(amount=BOSS_EXTRUDE11_DEPTH)


with BuildPart() as part_10:
    add(part_9.part)

    # Combine10: cut body 2 10
    add(body_2_10.part, mode=Mode.SUBTRACT)


with BuildPart() as body_2_11:
    # Sketch12 → Boss-Extrude12 (new body)
    with BuildSketch(Plane.XY.offset(BOSS_EXTRUDE12_START)):
        with Locations((-71.75, -11.7)):
            Rectangle(SKETCH12_W, SKETCH12_H)
    extrude(amount=BOSS_EXTRUDE12_DEPTH)


with BuildPart() as part_11:
    add(part_10.part)

    # Combine11: cut body 2 11
    add(body_2_11.part, mode=Mode.SUBTRACT)


with BuildPart() as body_2_12:
    # Sketch13 → Boss-Extrude13 (new body)
    with BuildSketch(Plane.XY.offset(BOSS_EXTRUDE13_START)):
        with Locations((-71.75, -20)):
            Rectangle(SKETCH13_W, SKETCH13_H)
    extrude(amount=BOSS_EXTRUDE13_DEPTH)


with BuildPart() as part_12:
    add(part_11.part)

    # Combine12: cut body 2 12
    add(body_2_12.part, mode=Mode.SUBTRACT)


with BuildPart() as body_2_13:
    # Sketch14 → Boss-Extrude14 (new body)
    with BuildSketch(Plane.XY.offset(BOSS_EXTRUDE14_START)):
        with Locations((-71.75, -28.3)):
            Rectangle(SKETCH14_W, SKETCH14_H)
    extrude(amount=BOSS_EXTRUDE14_DEPTH)


with BuildPart() as part_13:
    add(part_12.part)

    # Combine13: cut body 2 13
    add(body_2_13.part, mode=Mode.SUBTRACT)


with BuildPart() as body_2_14:
    # Sketch15 → Boss-Extrude15 (new body)
    with BuildSketch(Plane.XY.offset(BOSS_EXTRUDE15_START)):
        with Locations((-71.75, -20)):
            Rectangle(SKETCH15_W, SKETCH15_H)
    extrude(amount=BOSS_EXTRUDE15_DEPTH)


with BuildPart() as part_14:
    add(part_13.part)

    # Combine14: cut body 2 14
    add(body_2_14.part, mode=Mode.SUBTRACT)

    # Sketch16 → Boss-Extrude16 (add)
    with BuildSketch(Plane(origin=(0, 0, 0), x_dir=(0, 0, -1), z_dir=(1, 0, 0)).offset(BOSS_EXTRUDE16_START)):
        with BuildLine():
            Line((-51.904610688, -14.86969785), (-52.468426261, -15.074909936))
            ThreePointArc((-52.468426261, -15.074909936), (-66, -5.6), (-79.531573739, -15.074909936))
            Line((-79.531573739, -15.074909936), (-80.095389312, -14.86969785))
            ThreePointArc((-80.095389312, -14.86969785), (-66, -5), (-51.904610688, -14.86969785))
        make_face()
    extrude(amount=BOSS_EXTRUDE16_DEPTH)


with BuildPart() as body_2_15:
    # Sketch17 → Boss-Extrude17 (new body)
    with BuildSketch(Plane.XY.offset(BOSS_EXTRUDE17_START)):
        with Locations((-68.35, -65)):
            Rectangle(SKETCH17_W, SKETCH17_H)
    extrude(amount=BOSS_EXTRUDE17_DEPTH)


with BuildPart() as part_15:
    add(part_14.part)

    # Combine15: cut body 2 15
    add(body_2_15.part, mode=Mode.SUBTRACT)


with BuildPart() as body_2_16:
    # Sketch18 → Boss-Extrude18 (new body)
    with BuildSketch(Plane.XY.offset(BOSS_EXTRUDE18_START)):
        with Locations((-68.35, -65)):
            Rectangle(SKETCH18_W, SKETCH18_H)
    extrude(amount=BOSS_EXTRUDE18_DEPTH)


with BuildPart() as part_16:
    add(part_15.part)

    # Combine16: cut body 2 16
    add(body_2_16.part, mode=Mode.SUBTRACT)


with BuildPart() as body_2_17:
    # Sketch19 → Boss-Extrude19 (new body)
    with BuildSketch(Plane.XY.offset(BOSS_EXTRUDE19_START)):
        with Locations((-67.35, -65)):
            Rectangle(SKETCH19_W, SKETCH19_H)
    extrude(amount=BOSS_EXTRUDE19_DEPTH)


with BuildPart() as part_17:
    add(part_16.part)

    # Combine17: cut body 2 17
    add(body_2_17.part, mode=Mode.SUBTRACT)


with BuildPart() as body_2_18:
    # Sketch20 → Boss-Extrude20 (new body)
    with BuildSketch(Plane(origin=(0, 0, 0), x_dir=(0, 0, -1), z_dir=(1, 0, 0)).offset(BOSS_EXTRUDE20_START)):
        with Locations((-66, -65)):
            Circle(SKETCH20_R)
    extrude(amount=BOSS_EXTRUDE20_DEPTH)


with BuildPart() as part_18:
    add(part_17.part)

    # Combine18: cut body 2 18
    add(body_2_18.part, mode=Mode.SUBTRACT)


with BuildPart() as body_2_19:
    # Sketch21 → Boss-Extrude21 (new body)
    with BuildSketch(Plane(origin=(0, 0, 0), x_dir=(0, 0, -1), z_dir=(1, 0, 0)).offset(BOSS_EXTRUDE21_START)):
        with Locations(Location((-66, -65, 0), (0, 0, 180))):
            Circle(SKETCH21_R)
    extrude(amount=BOSS_EXTRUDE21_DEPTH)


with BuildPart() as part_19:
    add(part_18.part)

    # Combine19: cut body 2 19
    add(body_2_19.part, mode=Mode.SUBTRACT)


with BuildPart() as body_2_20:
    # Sketch22 → Boss-Extrude22 (new body)
    with BuildSketch(Plane.XY.offset(BOSS_EXTRUDE22_START)):
        with Locations((-70.45, -47.4)):
            Rectangle(SKETCH22_W, SKETCH22_H)
    extrude(amount=BOSS_EXTRUDE22_DEPTH)


with BuildPart() as part_20:
    add(part_19.part)

    # Combine20: cut body 2 20
    add(body_2_20.part, mode=Mode.SUBTRACT)


with BuildPart() as body_2_21:
    # Sketch23 → Boss-Extrude23 (new body)
    with BuildSketch(Plane(origin=(0, 0, 0), x_dir=(0, 0, -1), z_dir=(1, 0, 0)).offset(BOSS_EXTRUDE23_START)):
        with Locations((-72, -54)):
            Circle(SKETCH23_R)
    extrude(amount=BOSS_EXTRUDE23_DEPTH)


with BuildPart() as part_21:
    add(part_20.part)

    # Combine21: cut body 2 21
    add(body_2_21.part, mode=Mode.SUBTRACT)


with BuildPart() as body_2_22:
    # Sketch24 → Boss-Extrude24 (new body)
    with BuildSketch(Plane(origin=(0, 0, 0), x_dir=(0, 0, -1), z_dir=(1, 0, 0)).offset(BOSS_EXTRUDE24_START)):
        with Locations((-72, -54)):
            Circle(SKETCH24_R)
    extrude(amount=BOSS_EXTRUDE24_DEPTH)


with BuildPart() as part_22:
    add(part_21.part)

    # Combine22: cut body 2 22
    add(body_2_22.part, mode=Mode.SUBTRACT)


with BuildPart() as body_2_23:
    # Sketch25 → Boss-Extrude25 (new body)
    with BuildSketch(Plane.XY.offset(BOSS_EXTRUDE25_START)):
        with Locations((-68.35, -46)):
            Rectangle(SKETCH25_W, SKETCH25_H)
    extrude(amount=BOSS_EXTRUDE25_DEPTH)


with BuildPart() as part_23:
    add(part_22.part)

    # Combine23: cut body 2 23
    add(body_2_23.part, mode=Mode.SUBTRACT)

    # Sketch26 → Boss-Extrude26 (add)
    with BuildSketch(Plane(origin=(0, 0, 0), x_dir=(1, 0, 0), z_dir=(0, 1, 0)).offset(BOSS_EXTRUDE26_START)):
        Polygon((-70.6, -59), (-70.6, -58), (-64.4, -58), (-64.4, -57.6), (-63.8, -57.6), (-63, -58.4), (-63, -59), align=None)
    extrude(amount=BOSS_EXTRUDE26_DEPTH)


with BuildPart() as body_2_24:
    # Sketch27 → Boss-Extrude27 (new body)
    with BuildSketch(Plane.XY.offset(BOSS_EXTRUDE27_START)):
        with Locations((-68.35, -46)):
            Rectangle(SKETCH27_W, SKETCH27_H)
    extrude(amount=BOSS_EXTRUDE27_DEPTH)


with BuildPart() as part_24:
    add(part_23.part)

    # Combine24: cut body 2 24
    add(body_2_24.part, mode=Mode.SUBTRACT)

    # Sketch28 → Boss-Extrude28 (add)
    with BuildSketch(Plane(origin=(0, 0, 0), x_dir=(1, 0, 0), z_dir=(0, 1, 0)).offset(BOSS_EXTRUDE28_START)):
        Polygon((-70.6, -73), (-70.6, -74), (-64.4, -74), (-64.4, -74.4), (-63.8, -74.4), (-63, -73.6), (-63, -73), align=None)
    extrude(amount=BOSS_EXTRUDE28_DEPTH)


solid = part_24.part
